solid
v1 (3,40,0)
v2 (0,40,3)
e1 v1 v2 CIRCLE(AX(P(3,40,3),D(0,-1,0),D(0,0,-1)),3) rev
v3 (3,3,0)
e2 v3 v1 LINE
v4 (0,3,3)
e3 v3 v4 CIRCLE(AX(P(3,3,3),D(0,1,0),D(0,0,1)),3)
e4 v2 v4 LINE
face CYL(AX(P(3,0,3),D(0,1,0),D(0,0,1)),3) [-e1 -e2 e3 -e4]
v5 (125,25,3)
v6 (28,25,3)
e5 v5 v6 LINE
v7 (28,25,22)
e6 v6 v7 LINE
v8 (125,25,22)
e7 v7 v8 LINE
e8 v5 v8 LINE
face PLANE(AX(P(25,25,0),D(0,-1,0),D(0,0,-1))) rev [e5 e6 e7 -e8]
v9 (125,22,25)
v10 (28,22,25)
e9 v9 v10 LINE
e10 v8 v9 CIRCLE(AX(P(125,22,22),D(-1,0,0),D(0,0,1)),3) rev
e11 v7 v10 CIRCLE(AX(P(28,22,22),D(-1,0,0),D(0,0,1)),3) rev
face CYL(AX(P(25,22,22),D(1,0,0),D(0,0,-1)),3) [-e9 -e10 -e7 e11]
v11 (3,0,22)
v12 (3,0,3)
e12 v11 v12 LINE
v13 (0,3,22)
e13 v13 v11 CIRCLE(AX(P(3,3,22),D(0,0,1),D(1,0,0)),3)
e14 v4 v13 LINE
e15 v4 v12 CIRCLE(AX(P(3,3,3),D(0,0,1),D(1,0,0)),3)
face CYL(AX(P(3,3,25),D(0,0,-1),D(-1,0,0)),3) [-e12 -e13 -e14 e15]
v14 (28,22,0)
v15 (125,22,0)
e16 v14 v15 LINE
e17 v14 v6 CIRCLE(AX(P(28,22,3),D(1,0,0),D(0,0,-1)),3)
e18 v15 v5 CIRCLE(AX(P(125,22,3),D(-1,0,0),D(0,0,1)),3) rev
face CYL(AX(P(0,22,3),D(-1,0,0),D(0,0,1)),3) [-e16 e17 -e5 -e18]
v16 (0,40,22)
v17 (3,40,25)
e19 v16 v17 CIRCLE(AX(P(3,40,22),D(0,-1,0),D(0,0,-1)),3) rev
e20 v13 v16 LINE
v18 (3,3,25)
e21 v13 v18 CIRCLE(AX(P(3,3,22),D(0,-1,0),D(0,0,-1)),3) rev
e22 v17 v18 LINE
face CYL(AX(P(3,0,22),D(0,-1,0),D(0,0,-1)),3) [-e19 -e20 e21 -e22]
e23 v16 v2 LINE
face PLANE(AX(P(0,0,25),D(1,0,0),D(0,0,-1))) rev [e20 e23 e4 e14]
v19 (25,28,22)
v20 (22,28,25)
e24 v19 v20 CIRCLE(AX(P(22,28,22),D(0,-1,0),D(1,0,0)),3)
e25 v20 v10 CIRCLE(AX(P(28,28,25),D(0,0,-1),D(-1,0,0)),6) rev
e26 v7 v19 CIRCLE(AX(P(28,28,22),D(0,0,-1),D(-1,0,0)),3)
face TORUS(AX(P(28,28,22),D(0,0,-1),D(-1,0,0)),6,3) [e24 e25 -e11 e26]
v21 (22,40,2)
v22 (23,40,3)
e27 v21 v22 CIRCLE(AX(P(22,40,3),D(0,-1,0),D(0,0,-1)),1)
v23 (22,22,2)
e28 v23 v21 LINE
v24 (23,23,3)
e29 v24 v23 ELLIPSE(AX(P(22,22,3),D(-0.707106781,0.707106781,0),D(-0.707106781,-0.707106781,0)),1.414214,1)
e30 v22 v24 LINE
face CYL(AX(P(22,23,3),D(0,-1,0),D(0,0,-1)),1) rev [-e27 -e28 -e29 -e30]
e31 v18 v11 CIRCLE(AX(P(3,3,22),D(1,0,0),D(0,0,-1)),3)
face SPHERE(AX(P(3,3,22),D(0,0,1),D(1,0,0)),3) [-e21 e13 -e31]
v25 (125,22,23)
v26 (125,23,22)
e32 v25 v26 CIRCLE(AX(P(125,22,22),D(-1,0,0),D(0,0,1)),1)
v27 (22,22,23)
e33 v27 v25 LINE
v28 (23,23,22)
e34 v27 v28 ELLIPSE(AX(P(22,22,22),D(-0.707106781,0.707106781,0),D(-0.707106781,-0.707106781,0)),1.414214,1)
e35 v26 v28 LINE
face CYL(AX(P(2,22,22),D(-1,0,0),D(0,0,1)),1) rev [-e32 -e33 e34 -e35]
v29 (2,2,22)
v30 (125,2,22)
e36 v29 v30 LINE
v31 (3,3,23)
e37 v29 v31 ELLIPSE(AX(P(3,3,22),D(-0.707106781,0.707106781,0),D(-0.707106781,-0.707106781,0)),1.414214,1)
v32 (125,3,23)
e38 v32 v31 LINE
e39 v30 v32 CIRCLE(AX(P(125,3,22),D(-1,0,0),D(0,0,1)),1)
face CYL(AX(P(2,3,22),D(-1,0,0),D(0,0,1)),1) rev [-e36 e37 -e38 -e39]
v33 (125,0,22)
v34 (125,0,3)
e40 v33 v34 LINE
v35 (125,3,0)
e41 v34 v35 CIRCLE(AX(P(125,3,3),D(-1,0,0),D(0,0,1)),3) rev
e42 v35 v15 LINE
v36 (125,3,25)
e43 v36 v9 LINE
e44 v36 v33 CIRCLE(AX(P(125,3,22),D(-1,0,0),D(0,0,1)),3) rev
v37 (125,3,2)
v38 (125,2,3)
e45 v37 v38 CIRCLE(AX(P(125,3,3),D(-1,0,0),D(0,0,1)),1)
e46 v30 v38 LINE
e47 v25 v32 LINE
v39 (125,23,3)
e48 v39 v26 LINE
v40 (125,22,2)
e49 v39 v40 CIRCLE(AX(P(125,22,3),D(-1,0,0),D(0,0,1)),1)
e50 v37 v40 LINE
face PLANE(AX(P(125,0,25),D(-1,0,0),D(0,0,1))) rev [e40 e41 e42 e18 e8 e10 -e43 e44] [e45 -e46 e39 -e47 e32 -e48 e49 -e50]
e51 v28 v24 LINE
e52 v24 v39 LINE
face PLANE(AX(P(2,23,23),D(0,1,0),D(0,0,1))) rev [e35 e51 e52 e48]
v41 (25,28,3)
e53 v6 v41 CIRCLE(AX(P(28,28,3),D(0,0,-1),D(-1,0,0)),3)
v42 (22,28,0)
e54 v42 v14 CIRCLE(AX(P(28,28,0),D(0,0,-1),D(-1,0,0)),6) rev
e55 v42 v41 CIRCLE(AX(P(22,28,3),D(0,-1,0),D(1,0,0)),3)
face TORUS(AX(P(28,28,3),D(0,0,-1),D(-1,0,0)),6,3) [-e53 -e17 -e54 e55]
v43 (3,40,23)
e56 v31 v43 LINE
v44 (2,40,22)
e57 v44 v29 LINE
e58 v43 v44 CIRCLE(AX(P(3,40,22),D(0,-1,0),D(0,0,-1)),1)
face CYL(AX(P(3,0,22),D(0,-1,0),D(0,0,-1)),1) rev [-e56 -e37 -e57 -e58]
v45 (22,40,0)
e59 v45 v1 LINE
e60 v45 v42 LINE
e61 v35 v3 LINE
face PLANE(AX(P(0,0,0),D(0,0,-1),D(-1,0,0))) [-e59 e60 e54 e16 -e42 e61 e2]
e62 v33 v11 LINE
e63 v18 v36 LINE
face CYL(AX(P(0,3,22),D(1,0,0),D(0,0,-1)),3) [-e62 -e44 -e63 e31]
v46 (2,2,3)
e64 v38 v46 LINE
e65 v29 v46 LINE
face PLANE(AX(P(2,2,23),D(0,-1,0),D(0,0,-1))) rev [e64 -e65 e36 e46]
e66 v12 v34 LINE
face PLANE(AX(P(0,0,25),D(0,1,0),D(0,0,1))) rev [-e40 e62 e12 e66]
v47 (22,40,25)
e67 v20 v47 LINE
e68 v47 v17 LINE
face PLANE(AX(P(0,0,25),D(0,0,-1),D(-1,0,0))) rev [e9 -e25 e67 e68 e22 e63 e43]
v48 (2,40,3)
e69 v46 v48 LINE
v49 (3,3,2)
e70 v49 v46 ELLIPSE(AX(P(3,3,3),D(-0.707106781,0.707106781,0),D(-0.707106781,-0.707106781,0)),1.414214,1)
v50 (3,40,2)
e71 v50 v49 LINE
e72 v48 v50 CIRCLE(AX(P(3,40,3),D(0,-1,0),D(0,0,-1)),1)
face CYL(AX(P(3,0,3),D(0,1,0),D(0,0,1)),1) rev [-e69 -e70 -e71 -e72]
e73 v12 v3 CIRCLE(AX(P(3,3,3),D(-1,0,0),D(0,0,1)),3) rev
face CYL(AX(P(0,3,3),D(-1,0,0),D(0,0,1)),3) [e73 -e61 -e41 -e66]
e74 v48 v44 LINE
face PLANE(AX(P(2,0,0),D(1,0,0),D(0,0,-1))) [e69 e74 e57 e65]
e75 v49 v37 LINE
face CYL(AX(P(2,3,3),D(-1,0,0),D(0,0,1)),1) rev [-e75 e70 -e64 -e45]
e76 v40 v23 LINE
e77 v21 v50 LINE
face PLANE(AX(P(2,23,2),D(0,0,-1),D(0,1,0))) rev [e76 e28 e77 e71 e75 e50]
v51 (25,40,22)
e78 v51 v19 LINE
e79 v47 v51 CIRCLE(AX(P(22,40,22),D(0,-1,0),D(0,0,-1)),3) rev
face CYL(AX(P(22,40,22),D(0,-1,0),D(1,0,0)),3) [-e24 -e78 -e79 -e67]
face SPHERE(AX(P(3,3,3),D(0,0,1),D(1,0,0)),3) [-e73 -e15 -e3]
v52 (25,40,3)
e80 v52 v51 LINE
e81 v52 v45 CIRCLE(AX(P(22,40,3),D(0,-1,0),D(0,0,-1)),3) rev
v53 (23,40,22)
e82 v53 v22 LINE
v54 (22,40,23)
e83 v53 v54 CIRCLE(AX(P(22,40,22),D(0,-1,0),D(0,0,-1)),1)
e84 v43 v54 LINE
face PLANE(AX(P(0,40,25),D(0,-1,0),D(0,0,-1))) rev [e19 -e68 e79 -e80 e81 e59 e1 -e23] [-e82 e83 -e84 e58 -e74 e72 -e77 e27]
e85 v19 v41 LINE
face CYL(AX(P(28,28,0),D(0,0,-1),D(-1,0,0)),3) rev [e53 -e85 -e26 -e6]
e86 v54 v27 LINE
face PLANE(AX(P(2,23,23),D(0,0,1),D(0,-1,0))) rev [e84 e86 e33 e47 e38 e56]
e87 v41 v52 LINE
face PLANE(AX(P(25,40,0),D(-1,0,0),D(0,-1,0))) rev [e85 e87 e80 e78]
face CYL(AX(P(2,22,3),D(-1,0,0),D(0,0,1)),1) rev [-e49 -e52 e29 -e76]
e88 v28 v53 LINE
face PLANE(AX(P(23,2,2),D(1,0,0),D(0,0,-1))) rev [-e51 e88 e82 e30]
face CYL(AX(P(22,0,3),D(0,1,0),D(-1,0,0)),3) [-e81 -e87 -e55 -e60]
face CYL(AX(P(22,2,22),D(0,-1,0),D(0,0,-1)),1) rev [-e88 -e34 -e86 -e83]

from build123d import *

# Parameters (mm, degrees)
SKETCH1_W           = 125
SKETCH1_H           = 40
BOSS_EXTRUDE1_DEPTH = 25
SKETCH2_W           = 100
SKETCH2_H           = 15
CUT_EXTRUDE1_DEPTH  = 25
SKETCH3_W           = 21
SKETCH3_H           = 21
CUT_EXTRUDE2_DEPTH  = 123
SKETCH4_W           = 21
SKETCH4_H           = 21
CUT_EXTRUDE3_DEPTH  = 38
FILLET3_R           = 1
FILLET4_R           = 1
FILLET5_R           = 1
FILLET6_R           = 1
FILLET7_R           = 1
FILLET8_R           = 1
FILLET9_R           = 3
FILLET11_R          = 3
FILLET12_R          = 3


with BuildPart() as part:
    # Sketch1 → Boss-Extrude1 (new body)
    with BuildSketch(Plane.XY):
        with Locations((62.5, 20)):
            Rectangle(SKETCH1_W, SKETCH1_H)
    extrude(amount=BOSS_EXTRUDE1_DEPTH)

    # Sketch2 → Cut-Extrude1 (cut)
    with BuildSketch(Plane.XY.offset(25)):
        with Locations((75, 32.5)):
            Rectangle(SKETCH2_W, SKETCH2_H)
    extrude(amount=-CUT_EXTRUDE1_DEPTH, mode=Mode.SUBTRACT)

    # Sketch3 → Cut-Extrude2 (cut)
    with BuildSketch(Plane(origin=(125, 0, 0), x_dir=(0, 0, -1), z_dir=(1, 0, 0))):
        with Locations((-12.5, 12.5)):
            Rectangle(SKETCH3_W, SKETCH3_H)
    extrude(amount=-CUT_EXTRUDE2_DEPTH, mode=Mode.SUBTRACT)

    # Sketch4 → Cut-Extrude3 (cut)
    with BuildSketch(Plane(origin=(0, 40, 0), x_dir=(1, 0, 0), z_dir=(0, 1, 0))):
        with Locations((12.5, -12.5)):
            Rectangle(SKETCH4_W, SKETCH4_H)
    extrude(amount=-CUT_EXTRUDE3_DEPTH, mode=Mode.SUBTRACT)

    # Fillet3
    fillet3_edges = [part.edges().sort_by_distance(p)[0] for p in [
        (2, 21, 2),
        (63.5, 2, 2),
    ]]
    fillet(fillet3_edges, radius=FILLET3_R)

    # Fillet4
    fillet4_edges = [part.edges().sort_by_distance(p)[0] for p in [
        (2, 21, 23),
        (63.5, 2, 23),
    ]]
    fillet(fillet4_edges, radius=FILLET4_R)

    # Fillet5
    fillet5_edges = [part.edges().sort_by_distance(p)[0] for p in [
        (74, 23, 2),
    ]]
    fillet(fillet5_edges, radius=FILLET5_R)

    # Fillet6
    fillet6_edges = [part.edges().sort_by_distance(p)[0] for p in [
        (74, 23, 23),
    ]]
    fillet(fillet6_edges, radius=FILLET6_R)

    # Fillet7
    fillet7_edges = [part.edges().sort_by_distance(p)[0] for p in [
        (23, 31, 23),
    ]]
    fillet(fillet7_edges, radius=FILLET7_R)

    # Fillet8
    fillet8_edges = [part.edges().sort_by_distance(p)[0] for p in [
        (23, 31, 2),
    ]]
    fillet(fillet8_edges, radius=FILLET8_R)

    # Fillet9
    fillet9_edges = [part.edges().sort_by_distance(p)[0] for p in [
        (25, 25, 12.5),
        (25, 32.5, 25),
        (75, 25, 25),
        (0, 20, 25),
        (62.5, 0, 25),
    ]]
    fillet(fillet9_edges, radius=FILLET9_R)

    # Fillet11
    fillet11_edges = [part.edges().sort_by_distance(p)[0] for p in [
        (76.5, 25, 0),
        (25.878679656, 25.878679656, 0),
        (25, 34, 0),
        (62.5, 0, 0),
        (0, 20, 0),
    ]]
    fillet(fillet11_edges, radius=FILLET11_R)

    # Fillet12
    # the kernel refuses this fillet: 3 mm, written as the material it takes off along each edge
    with BuildSketch(Plane(origin=(3, 3, 22), x_dir=(-1, 0, 0), z_dir=(0, -1, 0))) as fillet12_piece_1_section:
        Polygon((0, 0), (FILLET12_R, 0), (FILLET12_R, -FILLET12_R), (0, -FILLET12_R), align=None)
    fillet12_piece_1 = extrude(amount=FILLET12_R, mode=Mode.PRIVATE)
    fillet12_piece_1 = fillet12_piece_1 - Plane(origin=(3, 3, 22), x_dir=(0.7071067811865475, 0, -0.7071067811865475), z_dir=(0, -1, 0)) * Sphere(FILLET12_R, mode=Mode.PRIVATE)
    add(fillet12_piece_1, mode=Mode.SUBTRACT)
    with BuildSketch(Plane(origin=(3, 3, 3), x_dir=(-1, 0, 0), z_dir=(0, -1, 0))) as fillet12_piece_2_section:
        Polygon((0, 0), (FILLET12_R, 0), (FILLET12_R, FILLET12_R), (0, FILLET12_R), align=None)
    fillet12_piece_2 = extrude(amount=FILLET12_R, mode=Mode.PRIVATE)
    fillet12_piece_2 = fillet12_piece_2 - Plane(origin=(3, 3, 3), x_dir=(0.7071067811865475, 0, 0.7071067811865475), z_dir=(0, -1, 0)) * Sphere(FILLET12_R, mode=Mode.PRIVATE)
    add(fillet12_piece_2, mode=Mode.SUBTRACT)
    with BuildSketch(Plane(origin=(0, 0, 3), x_dir=(1, 0, 0), z_dir=(0, 0, 1))) as fillet12_piece_3:
        with BuildLine():
            CenterArc((FILLET12_R, FILLET12_R), FILLET12_R, 180, 90)
            Line((0, FILLET12_R), (0, 0))
            Line((0, 0), (FILLET12_R, 0))
        make_face()
    extrude(amount=19, mode=Mode.SUBTRACT)


solid = part.part
